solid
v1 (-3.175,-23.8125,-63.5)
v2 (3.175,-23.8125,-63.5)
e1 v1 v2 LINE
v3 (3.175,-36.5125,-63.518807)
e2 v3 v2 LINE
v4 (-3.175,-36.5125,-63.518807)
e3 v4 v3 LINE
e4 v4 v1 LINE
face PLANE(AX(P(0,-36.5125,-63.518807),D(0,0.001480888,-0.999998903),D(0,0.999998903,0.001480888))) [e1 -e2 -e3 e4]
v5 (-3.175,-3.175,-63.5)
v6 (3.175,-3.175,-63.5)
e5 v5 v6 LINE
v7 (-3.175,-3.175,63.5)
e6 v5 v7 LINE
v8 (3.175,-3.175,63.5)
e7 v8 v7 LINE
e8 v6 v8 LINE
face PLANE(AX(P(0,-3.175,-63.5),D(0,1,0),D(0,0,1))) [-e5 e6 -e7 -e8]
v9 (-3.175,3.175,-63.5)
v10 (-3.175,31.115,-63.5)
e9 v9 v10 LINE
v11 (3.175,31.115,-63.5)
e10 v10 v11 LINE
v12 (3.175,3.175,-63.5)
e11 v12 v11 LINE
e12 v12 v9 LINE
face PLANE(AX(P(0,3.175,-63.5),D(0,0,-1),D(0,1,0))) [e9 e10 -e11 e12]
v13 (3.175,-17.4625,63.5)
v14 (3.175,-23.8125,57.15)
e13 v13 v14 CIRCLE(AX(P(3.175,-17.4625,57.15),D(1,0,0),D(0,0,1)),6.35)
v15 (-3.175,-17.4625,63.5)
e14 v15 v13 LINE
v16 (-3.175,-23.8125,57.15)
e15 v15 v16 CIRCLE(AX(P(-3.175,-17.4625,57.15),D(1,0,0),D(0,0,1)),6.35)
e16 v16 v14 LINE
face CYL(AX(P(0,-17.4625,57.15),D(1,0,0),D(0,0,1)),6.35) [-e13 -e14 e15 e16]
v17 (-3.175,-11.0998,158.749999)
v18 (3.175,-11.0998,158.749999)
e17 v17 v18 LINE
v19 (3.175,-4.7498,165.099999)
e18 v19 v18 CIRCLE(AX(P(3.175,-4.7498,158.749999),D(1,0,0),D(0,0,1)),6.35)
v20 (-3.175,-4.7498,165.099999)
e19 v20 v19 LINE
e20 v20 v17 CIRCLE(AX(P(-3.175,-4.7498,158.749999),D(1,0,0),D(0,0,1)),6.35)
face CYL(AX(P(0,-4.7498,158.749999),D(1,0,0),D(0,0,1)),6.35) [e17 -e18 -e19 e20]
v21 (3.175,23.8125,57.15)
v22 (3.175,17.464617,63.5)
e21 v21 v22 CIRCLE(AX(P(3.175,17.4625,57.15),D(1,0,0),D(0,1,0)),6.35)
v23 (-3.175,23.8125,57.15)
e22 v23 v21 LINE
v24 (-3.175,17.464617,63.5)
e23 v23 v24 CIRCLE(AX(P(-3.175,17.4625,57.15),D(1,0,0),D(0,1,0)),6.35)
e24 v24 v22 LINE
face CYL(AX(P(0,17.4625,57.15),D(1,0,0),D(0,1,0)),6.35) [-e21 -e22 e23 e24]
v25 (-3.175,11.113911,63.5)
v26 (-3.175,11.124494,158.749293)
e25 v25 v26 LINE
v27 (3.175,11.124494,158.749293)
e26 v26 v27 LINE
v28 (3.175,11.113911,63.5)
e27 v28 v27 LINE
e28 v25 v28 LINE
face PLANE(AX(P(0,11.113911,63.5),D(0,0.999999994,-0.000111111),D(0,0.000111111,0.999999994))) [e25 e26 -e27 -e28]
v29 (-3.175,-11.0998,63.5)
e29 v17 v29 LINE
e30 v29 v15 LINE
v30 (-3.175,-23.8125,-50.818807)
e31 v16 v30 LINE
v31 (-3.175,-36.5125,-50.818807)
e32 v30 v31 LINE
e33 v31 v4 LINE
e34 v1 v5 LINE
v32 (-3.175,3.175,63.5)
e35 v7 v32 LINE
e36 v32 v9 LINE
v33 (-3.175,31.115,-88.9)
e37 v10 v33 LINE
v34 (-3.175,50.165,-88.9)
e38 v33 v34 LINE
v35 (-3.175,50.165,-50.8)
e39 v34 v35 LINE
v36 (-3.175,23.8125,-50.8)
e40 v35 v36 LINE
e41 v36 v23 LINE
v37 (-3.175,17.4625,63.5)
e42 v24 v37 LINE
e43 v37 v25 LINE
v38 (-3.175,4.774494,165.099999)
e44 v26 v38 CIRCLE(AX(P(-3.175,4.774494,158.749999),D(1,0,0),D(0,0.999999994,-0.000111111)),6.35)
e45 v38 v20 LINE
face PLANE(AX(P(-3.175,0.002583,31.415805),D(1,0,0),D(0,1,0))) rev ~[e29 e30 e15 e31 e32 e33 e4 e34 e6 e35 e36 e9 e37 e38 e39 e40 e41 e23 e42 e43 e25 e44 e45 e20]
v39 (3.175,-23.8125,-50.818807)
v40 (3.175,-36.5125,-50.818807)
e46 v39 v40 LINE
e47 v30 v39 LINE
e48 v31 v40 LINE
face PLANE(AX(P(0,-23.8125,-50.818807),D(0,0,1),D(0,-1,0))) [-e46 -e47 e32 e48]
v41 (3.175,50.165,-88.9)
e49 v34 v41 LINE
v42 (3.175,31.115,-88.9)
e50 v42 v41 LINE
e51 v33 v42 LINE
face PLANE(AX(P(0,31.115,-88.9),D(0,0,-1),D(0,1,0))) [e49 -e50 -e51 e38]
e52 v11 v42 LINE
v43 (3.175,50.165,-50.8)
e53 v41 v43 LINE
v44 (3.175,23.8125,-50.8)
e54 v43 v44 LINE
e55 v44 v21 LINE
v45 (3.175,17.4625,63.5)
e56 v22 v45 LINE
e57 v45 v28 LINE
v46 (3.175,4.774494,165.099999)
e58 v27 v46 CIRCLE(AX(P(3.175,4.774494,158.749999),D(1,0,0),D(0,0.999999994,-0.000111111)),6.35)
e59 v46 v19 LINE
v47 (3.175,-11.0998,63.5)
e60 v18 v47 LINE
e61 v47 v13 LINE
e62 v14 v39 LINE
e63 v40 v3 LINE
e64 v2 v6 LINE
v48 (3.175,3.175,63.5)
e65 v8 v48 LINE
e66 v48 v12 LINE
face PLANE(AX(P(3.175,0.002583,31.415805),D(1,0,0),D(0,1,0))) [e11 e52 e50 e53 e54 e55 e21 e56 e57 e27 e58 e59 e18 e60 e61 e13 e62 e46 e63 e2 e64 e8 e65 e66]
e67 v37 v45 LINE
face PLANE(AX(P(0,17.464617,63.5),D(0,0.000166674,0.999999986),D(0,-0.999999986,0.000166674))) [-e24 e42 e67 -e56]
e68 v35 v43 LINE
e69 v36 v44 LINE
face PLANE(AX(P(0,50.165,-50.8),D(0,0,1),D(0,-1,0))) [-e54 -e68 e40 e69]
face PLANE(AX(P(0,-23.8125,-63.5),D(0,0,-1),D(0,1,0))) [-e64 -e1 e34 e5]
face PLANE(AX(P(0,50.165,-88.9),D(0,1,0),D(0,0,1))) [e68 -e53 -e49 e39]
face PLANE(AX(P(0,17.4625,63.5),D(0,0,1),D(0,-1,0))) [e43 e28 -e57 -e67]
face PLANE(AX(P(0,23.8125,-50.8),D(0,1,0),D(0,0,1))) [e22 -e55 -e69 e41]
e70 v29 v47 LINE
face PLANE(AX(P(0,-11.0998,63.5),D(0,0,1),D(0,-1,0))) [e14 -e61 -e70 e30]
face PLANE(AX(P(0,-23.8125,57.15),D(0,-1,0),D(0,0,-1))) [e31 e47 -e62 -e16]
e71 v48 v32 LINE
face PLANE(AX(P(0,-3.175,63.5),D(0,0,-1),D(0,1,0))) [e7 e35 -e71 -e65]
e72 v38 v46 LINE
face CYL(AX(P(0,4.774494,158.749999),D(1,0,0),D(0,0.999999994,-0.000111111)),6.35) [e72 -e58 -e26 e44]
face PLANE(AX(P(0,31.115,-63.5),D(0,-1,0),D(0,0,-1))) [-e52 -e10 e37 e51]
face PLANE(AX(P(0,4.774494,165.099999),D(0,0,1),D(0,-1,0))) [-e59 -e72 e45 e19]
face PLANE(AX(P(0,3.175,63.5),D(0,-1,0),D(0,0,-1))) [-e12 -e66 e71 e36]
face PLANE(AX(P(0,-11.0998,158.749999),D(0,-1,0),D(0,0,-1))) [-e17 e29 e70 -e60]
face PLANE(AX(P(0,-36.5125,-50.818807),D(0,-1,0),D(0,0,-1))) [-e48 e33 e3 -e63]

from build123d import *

# Parameters (mm, degrees)
F1_DEPTH = 3.175


# Not quite as in the source:
# - ends of sketch curves that miss each other by under 0.0002 mm in the source are joined


with BuildPart() as f1:
    # F0 (on Right) → F1 (new body, symmetric)
    with BuildSketch(Plane.YZ):
        with BuildLine():
            Line((3.175, -63.5), (23.8125, -63.5))
            Line((23.8125, -63.5), (23.8125, -50.8))
            Line((23.8125, -50.8), (23.8125, 57.15))
            ThreePointArc((23.8125, 57.15), (21.9533763667, 61.6393796296), (17.4646167058, 63.4999996472))
            Line((17.4646167058, 63.4999996472), (17.4625, 63.5))
            Line((17.4625, 63.5), (11.1139111112, 63.5))
            Line((11.1139111112, 63.5), (11.124494366, 158.7492930333))
            ThreePointArc((11.124494366, 158.7492930333), (9.2648719104, 163.2398771909), (4.7744944052, 165.0999985889))
            Line((4.7744944052, 165.0999985889), (-4.7498, 165.0999985889))
            ThreePointArc((-4.7498, 165.0999985889), (-9.2399280605, 163.2401266494), (-11.0998, 158.7499985889))
            Line((-11.0998, 158.7499985889), (-11.0998, 63.5))
            Line((-11.0998, 63.5), (-17.4498, 63.5))
            Line((-17.4498, 63.5), (-17.4625, 63.5))
            ThreePointArc((-17.4625, 63.5), (-21.9526280605, 61.6401280605), (-23.8125, 57.15))
            Line((-23.8125, 57.15), (-23.8125, -50.818807292))
            Line((-23.8125, -50.818807292), (-23.8125, -63.5))
            Line((-23.8125, -63.5), (-3.175, -63.5))
            Line((-3.175, -63.5), (-3.175, 63.5))
            Line((-3.175, 63.5), (3.175, 63.5))
            Line((3.175, 63.5), (3.175, -63.5))
        make_face()
        Polygon((23.8125, -50.8), (23.8125, -63.5), (31.115, -63.5), (31.115, -88.9), (50.165, -88.9), (50.165, -50.8), align=None)
        Polygon((-36.5125, -63.518807292), (-23.8125, -63.5), (-23.8125, -50.818807292), (-36.5125, -50.818807292), align=None)
    extrude(amount=F1_DEPTH, both=True)


solid = f1.part
